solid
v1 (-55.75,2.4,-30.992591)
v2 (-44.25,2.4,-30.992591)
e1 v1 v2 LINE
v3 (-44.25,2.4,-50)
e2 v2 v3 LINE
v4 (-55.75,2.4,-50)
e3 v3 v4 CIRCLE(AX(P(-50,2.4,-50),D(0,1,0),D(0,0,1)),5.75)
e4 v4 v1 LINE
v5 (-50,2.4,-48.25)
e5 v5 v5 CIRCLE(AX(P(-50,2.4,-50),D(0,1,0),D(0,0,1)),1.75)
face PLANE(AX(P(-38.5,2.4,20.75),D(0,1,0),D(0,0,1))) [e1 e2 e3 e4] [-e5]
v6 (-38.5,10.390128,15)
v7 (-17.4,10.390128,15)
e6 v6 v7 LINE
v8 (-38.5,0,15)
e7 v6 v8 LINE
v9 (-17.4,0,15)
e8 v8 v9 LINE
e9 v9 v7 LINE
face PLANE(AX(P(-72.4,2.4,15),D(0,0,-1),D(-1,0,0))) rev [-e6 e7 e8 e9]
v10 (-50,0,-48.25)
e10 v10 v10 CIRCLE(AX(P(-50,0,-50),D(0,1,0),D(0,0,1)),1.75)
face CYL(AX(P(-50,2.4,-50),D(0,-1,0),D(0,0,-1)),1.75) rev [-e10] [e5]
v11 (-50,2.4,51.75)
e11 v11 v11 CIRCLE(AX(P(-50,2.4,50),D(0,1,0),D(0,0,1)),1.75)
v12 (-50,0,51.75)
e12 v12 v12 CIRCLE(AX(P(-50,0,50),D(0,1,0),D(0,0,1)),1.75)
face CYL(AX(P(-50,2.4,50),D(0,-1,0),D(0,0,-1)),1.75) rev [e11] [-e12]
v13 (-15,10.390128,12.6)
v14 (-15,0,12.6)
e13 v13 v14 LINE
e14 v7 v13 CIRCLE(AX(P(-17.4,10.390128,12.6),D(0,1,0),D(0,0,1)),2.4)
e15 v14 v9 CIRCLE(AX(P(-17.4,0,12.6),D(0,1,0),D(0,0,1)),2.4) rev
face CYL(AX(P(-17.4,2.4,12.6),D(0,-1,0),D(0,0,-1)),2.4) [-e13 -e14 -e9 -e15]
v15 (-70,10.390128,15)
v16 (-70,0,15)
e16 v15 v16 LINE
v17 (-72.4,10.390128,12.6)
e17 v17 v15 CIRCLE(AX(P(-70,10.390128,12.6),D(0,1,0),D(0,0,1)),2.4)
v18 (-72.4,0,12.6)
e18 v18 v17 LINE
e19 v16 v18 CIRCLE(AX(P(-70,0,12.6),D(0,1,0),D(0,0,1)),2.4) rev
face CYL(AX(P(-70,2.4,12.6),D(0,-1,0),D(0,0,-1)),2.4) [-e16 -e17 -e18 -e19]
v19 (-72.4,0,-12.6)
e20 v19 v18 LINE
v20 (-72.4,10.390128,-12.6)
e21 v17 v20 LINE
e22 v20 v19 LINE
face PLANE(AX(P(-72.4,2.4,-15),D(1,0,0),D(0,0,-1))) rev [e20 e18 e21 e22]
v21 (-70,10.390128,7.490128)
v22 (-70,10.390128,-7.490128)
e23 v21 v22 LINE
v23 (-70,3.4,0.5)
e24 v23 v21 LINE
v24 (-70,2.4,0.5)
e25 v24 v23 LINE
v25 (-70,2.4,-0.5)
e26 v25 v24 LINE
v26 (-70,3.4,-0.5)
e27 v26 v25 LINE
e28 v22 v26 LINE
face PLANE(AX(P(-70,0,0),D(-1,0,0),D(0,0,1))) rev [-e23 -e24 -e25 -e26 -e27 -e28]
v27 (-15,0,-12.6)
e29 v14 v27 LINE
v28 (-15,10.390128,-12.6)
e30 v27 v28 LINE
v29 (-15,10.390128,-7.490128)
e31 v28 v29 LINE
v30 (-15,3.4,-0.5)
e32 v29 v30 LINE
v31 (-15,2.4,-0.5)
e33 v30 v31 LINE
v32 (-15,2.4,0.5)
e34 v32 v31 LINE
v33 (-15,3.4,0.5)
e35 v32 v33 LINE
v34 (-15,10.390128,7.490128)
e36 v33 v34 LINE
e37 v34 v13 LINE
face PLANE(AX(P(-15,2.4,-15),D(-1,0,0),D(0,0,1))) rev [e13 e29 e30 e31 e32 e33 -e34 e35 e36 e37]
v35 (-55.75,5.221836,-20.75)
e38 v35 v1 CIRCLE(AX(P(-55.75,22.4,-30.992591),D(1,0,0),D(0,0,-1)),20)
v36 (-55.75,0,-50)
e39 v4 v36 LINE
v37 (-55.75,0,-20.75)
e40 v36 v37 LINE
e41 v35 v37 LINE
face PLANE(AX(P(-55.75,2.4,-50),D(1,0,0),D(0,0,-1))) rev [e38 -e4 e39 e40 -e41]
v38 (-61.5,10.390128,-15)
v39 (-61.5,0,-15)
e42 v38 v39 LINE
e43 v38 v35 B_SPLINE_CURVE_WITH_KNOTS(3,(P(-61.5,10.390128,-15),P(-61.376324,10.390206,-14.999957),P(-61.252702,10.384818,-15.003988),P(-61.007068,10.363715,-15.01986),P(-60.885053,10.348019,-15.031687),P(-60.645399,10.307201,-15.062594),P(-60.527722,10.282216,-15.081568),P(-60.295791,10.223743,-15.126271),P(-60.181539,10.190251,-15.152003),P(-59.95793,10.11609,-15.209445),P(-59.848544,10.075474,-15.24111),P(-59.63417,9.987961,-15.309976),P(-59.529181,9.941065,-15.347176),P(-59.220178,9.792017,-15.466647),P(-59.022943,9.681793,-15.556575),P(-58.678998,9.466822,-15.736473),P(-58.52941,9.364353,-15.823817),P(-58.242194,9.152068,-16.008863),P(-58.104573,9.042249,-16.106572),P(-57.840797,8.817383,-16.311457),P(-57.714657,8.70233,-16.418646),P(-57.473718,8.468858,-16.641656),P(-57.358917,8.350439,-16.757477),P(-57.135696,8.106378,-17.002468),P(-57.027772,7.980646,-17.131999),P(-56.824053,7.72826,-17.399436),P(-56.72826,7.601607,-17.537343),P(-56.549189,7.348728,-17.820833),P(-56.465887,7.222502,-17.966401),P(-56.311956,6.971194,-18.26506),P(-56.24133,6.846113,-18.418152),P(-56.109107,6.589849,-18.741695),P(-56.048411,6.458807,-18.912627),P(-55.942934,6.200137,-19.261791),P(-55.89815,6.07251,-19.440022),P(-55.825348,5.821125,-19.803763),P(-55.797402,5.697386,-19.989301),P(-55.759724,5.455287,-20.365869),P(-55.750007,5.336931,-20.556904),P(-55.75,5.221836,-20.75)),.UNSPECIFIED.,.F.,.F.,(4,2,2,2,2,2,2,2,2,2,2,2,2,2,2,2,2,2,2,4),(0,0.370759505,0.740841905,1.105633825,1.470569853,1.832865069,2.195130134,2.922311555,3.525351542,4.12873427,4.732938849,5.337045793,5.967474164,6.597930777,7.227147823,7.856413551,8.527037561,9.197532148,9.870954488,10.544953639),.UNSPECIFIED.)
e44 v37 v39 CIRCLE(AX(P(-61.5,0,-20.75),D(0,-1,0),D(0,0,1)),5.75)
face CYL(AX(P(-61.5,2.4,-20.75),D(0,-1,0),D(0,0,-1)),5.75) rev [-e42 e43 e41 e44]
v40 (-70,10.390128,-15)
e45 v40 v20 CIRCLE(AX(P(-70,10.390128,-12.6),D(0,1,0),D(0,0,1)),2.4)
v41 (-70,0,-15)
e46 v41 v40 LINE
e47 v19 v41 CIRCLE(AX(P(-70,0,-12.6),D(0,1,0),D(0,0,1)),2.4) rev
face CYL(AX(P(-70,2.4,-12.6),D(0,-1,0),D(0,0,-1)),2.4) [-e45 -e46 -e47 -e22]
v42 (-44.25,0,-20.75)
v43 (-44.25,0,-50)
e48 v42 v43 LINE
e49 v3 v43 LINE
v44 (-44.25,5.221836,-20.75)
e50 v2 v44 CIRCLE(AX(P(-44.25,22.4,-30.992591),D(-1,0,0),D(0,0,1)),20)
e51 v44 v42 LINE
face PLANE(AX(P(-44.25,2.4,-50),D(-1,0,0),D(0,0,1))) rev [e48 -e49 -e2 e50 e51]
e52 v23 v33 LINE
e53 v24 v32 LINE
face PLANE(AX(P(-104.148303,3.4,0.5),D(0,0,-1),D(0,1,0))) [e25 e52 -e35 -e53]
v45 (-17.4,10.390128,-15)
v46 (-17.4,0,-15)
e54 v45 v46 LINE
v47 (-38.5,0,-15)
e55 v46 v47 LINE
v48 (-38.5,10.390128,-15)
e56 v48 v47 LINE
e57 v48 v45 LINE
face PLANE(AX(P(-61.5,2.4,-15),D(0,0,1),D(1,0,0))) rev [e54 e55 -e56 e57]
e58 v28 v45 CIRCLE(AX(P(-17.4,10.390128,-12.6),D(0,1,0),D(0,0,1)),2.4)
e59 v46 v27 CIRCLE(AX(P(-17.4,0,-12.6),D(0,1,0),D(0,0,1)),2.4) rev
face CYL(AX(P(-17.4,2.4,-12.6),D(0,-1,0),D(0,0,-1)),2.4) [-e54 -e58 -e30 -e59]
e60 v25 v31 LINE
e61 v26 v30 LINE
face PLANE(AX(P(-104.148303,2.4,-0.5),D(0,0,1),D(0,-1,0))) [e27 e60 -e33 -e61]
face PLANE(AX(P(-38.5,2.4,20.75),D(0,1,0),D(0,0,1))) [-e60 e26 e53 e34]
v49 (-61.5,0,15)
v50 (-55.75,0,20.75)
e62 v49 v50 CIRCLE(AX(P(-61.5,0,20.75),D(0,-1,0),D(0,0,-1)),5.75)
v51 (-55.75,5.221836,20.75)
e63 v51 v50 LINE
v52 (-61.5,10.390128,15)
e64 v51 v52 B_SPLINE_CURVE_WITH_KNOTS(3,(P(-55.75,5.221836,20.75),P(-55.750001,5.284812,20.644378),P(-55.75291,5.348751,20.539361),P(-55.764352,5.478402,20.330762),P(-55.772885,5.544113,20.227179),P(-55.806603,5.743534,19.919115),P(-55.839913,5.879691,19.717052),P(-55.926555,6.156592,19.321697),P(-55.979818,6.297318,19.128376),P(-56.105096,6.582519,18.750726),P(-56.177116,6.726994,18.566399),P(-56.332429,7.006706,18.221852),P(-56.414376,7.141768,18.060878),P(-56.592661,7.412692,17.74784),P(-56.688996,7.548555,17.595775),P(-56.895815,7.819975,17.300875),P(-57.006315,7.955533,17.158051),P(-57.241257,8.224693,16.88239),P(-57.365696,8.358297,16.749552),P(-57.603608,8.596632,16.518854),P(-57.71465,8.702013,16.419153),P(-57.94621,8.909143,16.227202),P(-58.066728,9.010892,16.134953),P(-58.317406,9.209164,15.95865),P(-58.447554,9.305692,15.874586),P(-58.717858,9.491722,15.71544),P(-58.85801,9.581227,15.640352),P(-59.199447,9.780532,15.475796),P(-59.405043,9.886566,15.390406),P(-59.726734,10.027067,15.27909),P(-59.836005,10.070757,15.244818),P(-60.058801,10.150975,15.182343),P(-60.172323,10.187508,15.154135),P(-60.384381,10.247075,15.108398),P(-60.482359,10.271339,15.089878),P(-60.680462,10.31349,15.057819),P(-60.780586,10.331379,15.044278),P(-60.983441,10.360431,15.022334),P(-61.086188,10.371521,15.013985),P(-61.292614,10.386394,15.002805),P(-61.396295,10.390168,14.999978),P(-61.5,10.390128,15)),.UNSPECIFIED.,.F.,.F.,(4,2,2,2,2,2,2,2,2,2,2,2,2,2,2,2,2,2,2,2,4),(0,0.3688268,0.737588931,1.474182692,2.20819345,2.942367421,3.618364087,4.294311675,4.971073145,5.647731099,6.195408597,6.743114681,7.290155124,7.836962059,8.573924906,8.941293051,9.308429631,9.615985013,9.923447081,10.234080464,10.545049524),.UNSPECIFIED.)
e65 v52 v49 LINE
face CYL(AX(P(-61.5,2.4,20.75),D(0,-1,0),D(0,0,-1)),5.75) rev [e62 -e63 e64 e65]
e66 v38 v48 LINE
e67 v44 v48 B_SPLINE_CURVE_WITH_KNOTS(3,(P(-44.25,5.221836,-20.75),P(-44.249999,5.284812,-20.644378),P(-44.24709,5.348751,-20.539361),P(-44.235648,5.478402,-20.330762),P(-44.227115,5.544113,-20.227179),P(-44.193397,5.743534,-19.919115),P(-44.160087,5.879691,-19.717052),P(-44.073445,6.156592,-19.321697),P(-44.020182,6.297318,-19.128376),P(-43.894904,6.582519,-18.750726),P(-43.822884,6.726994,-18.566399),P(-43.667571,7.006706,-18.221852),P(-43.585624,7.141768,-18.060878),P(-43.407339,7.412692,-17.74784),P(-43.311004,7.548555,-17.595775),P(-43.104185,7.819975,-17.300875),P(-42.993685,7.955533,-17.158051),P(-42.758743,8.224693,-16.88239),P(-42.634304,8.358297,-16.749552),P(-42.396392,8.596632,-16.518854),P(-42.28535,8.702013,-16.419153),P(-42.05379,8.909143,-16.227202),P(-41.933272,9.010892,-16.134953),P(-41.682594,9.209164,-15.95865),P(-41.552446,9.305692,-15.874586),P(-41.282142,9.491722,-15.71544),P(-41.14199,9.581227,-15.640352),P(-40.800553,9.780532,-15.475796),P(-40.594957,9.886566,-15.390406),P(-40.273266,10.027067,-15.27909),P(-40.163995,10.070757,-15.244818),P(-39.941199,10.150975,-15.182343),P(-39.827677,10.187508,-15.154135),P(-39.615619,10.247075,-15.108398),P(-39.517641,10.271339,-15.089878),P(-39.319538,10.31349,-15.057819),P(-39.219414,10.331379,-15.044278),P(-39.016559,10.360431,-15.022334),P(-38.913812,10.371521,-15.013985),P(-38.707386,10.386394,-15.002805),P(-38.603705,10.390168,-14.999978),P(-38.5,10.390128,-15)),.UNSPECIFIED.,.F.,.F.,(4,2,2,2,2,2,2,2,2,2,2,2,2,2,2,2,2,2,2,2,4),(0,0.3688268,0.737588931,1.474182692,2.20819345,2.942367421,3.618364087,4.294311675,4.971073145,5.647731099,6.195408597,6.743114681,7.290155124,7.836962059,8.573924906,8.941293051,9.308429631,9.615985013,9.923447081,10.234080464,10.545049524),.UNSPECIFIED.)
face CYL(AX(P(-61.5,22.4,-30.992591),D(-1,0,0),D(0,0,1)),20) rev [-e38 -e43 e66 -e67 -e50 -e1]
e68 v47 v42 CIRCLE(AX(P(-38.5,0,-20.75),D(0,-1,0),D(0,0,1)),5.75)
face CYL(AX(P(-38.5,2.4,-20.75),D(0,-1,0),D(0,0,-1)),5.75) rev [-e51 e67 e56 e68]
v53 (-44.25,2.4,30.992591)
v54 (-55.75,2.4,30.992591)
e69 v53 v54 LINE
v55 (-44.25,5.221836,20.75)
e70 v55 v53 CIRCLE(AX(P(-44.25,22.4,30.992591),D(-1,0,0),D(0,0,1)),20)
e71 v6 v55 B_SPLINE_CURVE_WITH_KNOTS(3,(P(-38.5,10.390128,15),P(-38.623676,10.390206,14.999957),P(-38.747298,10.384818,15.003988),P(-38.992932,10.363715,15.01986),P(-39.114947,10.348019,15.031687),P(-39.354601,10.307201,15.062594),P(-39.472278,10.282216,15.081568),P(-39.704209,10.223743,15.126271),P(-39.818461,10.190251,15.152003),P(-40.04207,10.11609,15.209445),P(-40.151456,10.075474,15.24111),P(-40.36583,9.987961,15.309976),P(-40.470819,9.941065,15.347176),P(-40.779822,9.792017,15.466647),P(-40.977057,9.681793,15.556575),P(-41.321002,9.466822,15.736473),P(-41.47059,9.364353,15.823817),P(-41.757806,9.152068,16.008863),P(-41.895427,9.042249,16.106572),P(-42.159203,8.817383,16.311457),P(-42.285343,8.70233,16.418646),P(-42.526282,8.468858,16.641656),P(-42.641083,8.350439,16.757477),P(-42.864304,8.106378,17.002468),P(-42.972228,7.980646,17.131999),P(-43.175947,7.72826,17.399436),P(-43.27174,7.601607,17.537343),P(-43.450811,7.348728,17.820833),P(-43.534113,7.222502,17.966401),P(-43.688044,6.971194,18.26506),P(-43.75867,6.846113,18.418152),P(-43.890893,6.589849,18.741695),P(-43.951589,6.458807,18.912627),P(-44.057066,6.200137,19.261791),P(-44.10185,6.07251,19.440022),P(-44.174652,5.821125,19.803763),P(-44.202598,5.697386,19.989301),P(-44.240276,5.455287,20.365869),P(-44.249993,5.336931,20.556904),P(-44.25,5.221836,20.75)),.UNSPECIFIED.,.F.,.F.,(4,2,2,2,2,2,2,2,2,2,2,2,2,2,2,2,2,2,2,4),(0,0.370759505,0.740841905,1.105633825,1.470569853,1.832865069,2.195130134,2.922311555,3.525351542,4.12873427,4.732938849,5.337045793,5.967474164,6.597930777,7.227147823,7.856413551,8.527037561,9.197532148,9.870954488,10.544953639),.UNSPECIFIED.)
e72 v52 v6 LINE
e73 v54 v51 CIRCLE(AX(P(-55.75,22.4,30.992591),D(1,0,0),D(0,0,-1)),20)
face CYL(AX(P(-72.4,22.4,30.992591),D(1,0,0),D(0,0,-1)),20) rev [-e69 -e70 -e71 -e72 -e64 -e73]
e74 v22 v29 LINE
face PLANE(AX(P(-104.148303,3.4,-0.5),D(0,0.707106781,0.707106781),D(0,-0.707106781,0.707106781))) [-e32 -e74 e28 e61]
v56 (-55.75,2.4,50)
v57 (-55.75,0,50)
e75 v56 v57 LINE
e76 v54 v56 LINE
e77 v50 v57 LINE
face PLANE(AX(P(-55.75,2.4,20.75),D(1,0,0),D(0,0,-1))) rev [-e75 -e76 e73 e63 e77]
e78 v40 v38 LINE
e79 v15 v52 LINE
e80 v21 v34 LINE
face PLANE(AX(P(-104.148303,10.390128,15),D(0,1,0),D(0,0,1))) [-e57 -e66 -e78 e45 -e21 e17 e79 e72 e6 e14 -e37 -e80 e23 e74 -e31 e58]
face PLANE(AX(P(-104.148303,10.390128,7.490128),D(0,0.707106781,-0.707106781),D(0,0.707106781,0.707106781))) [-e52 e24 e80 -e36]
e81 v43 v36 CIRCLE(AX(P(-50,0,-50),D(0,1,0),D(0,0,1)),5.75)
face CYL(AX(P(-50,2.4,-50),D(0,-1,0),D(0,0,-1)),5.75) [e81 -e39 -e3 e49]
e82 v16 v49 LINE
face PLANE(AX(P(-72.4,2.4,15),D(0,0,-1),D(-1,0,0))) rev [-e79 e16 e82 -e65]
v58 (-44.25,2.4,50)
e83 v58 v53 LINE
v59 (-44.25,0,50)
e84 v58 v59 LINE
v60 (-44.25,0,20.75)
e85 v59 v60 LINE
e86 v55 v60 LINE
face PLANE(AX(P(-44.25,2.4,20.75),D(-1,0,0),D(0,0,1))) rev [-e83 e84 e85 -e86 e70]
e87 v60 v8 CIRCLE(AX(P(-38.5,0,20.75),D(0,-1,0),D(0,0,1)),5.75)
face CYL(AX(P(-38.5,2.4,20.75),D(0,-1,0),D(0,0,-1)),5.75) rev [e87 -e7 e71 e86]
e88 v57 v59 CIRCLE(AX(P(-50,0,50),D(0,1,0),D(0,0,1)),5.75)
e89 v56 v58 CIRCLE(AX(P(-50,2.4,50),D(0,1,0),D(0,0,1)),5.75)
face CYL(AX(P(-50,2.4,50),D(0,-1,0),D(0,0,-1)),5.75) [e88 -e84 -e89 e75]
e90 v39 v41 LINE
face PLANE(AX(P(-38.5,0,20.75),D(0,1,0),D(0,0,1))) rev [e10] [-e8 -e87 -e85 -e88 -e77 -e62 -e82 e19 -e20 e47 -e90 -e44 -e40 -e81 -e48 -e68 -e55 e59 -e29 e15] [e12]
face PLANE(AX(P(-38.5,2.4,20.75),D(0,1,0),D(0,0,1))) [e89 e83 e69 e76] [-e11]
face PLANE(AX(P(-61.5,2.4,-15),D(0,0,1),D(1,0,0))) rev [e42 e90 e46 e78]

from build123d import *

# Parameters (mm, degrees)
SKETCH1_R           = 1.75
BOSS_EXTRUDE1_DEPTH = 2.4
BOSS_EXTRUDE2_DEPTH = 57.4
SKETCH3_W           = 30
SKETCH3_H           = 10.390128061
BOSS_EXTRUDE3_DEPTH = 2.4
FILLET1_START       = -61.5000001
FILLET1_DEPTH       = 23.0000001
FILLET1_START_2     = 2.4
FILLET1_2_DEPTH     = 7.99015084
FILLET2_R           = 2.4


with BuildPart() as part:
    # Sketch1 → Boss-Extrude1 (new body)
    with BuildSketch(Plane(origin=(0, 0, 0), x_dir=(1, 0, 0), z_dir=(0, 1, 0))):
        with BuildLine():
            Line((-44.25, 50), (-44.25, 20.75))
            ThreePointArc((-44.25, 20.75), (-42.565863992, 16.684136008), (-38.5, 15))
            Line((-38.5, 15), (-15, 15))
            Line((-15, 15), (-15, -15))
            Line((-15, -15), (-38.5, -15))
            ThreePointArc((-38.5, -15), (-42.565863992, -16.684136008), (-44.25, -20.75))
            Line((-44.25, -20.75), (-44.25, -50))
            ThreePointArc((-44.25, -50), (-50, -55.75), (-55.75, -50))
            Line((-55.75, -50), (-55.75, -20.75))
            ThreePointArc((-55.75, -20.75), (-57.434136008, -16.684136008), (-61.5, -15))
            Line((-61.5, -15), (-72.4, -15))
            Line((-72.4, -15), (-72.4, 15))
            Line((-72.4, 15), (-61.5, 15))
            ThreePointArc((-61.5, 15), (-57.434136008, 16.684136008), (-55.75, 20.75))
            Line((-55.75, 20.75), (-55.75, 50))
            ThreePointArc((-55.75, 50), (-50, 55.75), (-44.25, 50))
        make_face()
        with Locations(Location((-50, 50, 0), (0, 0, 270))):
            Circle(SKETCH1_R, mode=Mode.SUBTRACT)
        with Locations(Location((-50, -50, 0), (0, 0, 270))):
            Circle(SKETCH1_R, mode=Mode.SUBTRACT)
    extrude(amount=BOSS_EXTRUDE1_DEPTH)

    # Sketch2 → Boss-Extrude2 (add)
    with BuildSketch(Plane(origin=(-15, 0, 0), x_dir=(0, 0, -1), z_dir=(1, 0, 0))):
        Polygon((-15, 0), (-15, 10.390128061), (-7.490128061, 10.390128061), (-0.5, 3.4), (-0.5, 2.4), (0.5, 2.4), (0.5, 3.4), (7.490128061, 10.390128061), (15, 10.390128061), (15, 0), align=None)
    extrude(amount=-BOSS_EXTRUDE2_DEPTH)

    # Sketch3 → Boss-Extrude3 (add)
    with BuildSketch(Plane.ZY.offset(72.4)):
        with Locations((0, 5.195064031)):
            Rectangle(SKETCH3_W, SKETCH3_H)
    extrude(amount=-BOSS_EXTRUDE3_DEPTH)

    # Fillet1: read off the stored shape, not the designer's step
    # Fillet1 outline → Fillet1 (add)
    with BuildSketch(Plane.YZ.offset(FILLET1_START)):
        with BuildLine():
            Line((2.4, -15), (2.4, -30.992591285))
            ThreePointArc((2.4, -30.992591285), (4.508703468, -22.053826918), (10.39015084, -14.999982893))
            Line((10.39015084, -14.999982893), (2.4, -15))
        make_face()
        with BuildLine():
            ThreePointArc((10.39015084, 14.999982893), (4.508703468, 22.053826918), (2.4, 30.992591285))
            Line((2.4, 30.992591285), (2.4, 15))
            Line((2.4, 15), (10.39015084, 14.999982893))
        make_face()
    extrude(amount=FILLET1_DEPTH)

    # Fillet1 2 outline → Fillet1 2 (cut)
    with BuildSketch(Plane(origin=(0, 0, 0), x_dir=(1, 0, 0), z_dir=(0, 1, 0)).offset(FILLET1_START_2)):
        with BuildLine():
            ThreePointArc((-38.5, -15), (-42.565863992, -16.684136008), (-44.25, -20.75))
            Line((-44.25, -20.75), (-44.25, -32))
            Line((-44.25, -32), (-38.5, -32))
            Line((-38.5, -32), (-38.5, -15))
        make_face()
        with BuildLine():
            Line((-61.5000001, -32), (-55.75, -32))
            Line((-55.75, -32), (-55.75, -20.75))
            ThreePointArc((-55.75, -20.75), (-57.434136008, -16.684136008), (-61.5, -15))
            Line((-61.5, -15), (-61.5000001, -32))
        make_face()
        with BuildLine():
            Line((-38.5, 15), (-38.5, 32))
            Line((-38.5, 32), (-44.25, 32))
            Line((-44.25, 32), (-44.25, 20.75))
            ThreePointArc((-44.25, 20.75), (-42.565863992, 16.684136008), (-38.5, 15))
        make_face()
        with BuildLine():
            Line((-55.75, 32), (-61.5000001, 32))
            Line((-61.5000001, 32), (-61.5, 15))
            ThreePointArc((-61.5, 15), (-57.434136008, 16.684136008), (-55.75, 20.75))
            Line((-55.75, 20.75), (-55.75, 32))
        make_face()
    extrude(amount=FILLET1_2_DEPTH, mode=Mode.SUBTRACT)

    # Fillet2
    fillet2_edges = [part.edges().sort_by_distance(p)[0] for p in [
        (-72.4, 5.19506403, 15),
        (-72.4, 5.19506403, -15),
        (-15, 5.19506403, -15),
        (-15, 5.19506403, 15),
    ]]
    fillet(fillet2_edges, radius=FILLET2_R)


solid = part.part
